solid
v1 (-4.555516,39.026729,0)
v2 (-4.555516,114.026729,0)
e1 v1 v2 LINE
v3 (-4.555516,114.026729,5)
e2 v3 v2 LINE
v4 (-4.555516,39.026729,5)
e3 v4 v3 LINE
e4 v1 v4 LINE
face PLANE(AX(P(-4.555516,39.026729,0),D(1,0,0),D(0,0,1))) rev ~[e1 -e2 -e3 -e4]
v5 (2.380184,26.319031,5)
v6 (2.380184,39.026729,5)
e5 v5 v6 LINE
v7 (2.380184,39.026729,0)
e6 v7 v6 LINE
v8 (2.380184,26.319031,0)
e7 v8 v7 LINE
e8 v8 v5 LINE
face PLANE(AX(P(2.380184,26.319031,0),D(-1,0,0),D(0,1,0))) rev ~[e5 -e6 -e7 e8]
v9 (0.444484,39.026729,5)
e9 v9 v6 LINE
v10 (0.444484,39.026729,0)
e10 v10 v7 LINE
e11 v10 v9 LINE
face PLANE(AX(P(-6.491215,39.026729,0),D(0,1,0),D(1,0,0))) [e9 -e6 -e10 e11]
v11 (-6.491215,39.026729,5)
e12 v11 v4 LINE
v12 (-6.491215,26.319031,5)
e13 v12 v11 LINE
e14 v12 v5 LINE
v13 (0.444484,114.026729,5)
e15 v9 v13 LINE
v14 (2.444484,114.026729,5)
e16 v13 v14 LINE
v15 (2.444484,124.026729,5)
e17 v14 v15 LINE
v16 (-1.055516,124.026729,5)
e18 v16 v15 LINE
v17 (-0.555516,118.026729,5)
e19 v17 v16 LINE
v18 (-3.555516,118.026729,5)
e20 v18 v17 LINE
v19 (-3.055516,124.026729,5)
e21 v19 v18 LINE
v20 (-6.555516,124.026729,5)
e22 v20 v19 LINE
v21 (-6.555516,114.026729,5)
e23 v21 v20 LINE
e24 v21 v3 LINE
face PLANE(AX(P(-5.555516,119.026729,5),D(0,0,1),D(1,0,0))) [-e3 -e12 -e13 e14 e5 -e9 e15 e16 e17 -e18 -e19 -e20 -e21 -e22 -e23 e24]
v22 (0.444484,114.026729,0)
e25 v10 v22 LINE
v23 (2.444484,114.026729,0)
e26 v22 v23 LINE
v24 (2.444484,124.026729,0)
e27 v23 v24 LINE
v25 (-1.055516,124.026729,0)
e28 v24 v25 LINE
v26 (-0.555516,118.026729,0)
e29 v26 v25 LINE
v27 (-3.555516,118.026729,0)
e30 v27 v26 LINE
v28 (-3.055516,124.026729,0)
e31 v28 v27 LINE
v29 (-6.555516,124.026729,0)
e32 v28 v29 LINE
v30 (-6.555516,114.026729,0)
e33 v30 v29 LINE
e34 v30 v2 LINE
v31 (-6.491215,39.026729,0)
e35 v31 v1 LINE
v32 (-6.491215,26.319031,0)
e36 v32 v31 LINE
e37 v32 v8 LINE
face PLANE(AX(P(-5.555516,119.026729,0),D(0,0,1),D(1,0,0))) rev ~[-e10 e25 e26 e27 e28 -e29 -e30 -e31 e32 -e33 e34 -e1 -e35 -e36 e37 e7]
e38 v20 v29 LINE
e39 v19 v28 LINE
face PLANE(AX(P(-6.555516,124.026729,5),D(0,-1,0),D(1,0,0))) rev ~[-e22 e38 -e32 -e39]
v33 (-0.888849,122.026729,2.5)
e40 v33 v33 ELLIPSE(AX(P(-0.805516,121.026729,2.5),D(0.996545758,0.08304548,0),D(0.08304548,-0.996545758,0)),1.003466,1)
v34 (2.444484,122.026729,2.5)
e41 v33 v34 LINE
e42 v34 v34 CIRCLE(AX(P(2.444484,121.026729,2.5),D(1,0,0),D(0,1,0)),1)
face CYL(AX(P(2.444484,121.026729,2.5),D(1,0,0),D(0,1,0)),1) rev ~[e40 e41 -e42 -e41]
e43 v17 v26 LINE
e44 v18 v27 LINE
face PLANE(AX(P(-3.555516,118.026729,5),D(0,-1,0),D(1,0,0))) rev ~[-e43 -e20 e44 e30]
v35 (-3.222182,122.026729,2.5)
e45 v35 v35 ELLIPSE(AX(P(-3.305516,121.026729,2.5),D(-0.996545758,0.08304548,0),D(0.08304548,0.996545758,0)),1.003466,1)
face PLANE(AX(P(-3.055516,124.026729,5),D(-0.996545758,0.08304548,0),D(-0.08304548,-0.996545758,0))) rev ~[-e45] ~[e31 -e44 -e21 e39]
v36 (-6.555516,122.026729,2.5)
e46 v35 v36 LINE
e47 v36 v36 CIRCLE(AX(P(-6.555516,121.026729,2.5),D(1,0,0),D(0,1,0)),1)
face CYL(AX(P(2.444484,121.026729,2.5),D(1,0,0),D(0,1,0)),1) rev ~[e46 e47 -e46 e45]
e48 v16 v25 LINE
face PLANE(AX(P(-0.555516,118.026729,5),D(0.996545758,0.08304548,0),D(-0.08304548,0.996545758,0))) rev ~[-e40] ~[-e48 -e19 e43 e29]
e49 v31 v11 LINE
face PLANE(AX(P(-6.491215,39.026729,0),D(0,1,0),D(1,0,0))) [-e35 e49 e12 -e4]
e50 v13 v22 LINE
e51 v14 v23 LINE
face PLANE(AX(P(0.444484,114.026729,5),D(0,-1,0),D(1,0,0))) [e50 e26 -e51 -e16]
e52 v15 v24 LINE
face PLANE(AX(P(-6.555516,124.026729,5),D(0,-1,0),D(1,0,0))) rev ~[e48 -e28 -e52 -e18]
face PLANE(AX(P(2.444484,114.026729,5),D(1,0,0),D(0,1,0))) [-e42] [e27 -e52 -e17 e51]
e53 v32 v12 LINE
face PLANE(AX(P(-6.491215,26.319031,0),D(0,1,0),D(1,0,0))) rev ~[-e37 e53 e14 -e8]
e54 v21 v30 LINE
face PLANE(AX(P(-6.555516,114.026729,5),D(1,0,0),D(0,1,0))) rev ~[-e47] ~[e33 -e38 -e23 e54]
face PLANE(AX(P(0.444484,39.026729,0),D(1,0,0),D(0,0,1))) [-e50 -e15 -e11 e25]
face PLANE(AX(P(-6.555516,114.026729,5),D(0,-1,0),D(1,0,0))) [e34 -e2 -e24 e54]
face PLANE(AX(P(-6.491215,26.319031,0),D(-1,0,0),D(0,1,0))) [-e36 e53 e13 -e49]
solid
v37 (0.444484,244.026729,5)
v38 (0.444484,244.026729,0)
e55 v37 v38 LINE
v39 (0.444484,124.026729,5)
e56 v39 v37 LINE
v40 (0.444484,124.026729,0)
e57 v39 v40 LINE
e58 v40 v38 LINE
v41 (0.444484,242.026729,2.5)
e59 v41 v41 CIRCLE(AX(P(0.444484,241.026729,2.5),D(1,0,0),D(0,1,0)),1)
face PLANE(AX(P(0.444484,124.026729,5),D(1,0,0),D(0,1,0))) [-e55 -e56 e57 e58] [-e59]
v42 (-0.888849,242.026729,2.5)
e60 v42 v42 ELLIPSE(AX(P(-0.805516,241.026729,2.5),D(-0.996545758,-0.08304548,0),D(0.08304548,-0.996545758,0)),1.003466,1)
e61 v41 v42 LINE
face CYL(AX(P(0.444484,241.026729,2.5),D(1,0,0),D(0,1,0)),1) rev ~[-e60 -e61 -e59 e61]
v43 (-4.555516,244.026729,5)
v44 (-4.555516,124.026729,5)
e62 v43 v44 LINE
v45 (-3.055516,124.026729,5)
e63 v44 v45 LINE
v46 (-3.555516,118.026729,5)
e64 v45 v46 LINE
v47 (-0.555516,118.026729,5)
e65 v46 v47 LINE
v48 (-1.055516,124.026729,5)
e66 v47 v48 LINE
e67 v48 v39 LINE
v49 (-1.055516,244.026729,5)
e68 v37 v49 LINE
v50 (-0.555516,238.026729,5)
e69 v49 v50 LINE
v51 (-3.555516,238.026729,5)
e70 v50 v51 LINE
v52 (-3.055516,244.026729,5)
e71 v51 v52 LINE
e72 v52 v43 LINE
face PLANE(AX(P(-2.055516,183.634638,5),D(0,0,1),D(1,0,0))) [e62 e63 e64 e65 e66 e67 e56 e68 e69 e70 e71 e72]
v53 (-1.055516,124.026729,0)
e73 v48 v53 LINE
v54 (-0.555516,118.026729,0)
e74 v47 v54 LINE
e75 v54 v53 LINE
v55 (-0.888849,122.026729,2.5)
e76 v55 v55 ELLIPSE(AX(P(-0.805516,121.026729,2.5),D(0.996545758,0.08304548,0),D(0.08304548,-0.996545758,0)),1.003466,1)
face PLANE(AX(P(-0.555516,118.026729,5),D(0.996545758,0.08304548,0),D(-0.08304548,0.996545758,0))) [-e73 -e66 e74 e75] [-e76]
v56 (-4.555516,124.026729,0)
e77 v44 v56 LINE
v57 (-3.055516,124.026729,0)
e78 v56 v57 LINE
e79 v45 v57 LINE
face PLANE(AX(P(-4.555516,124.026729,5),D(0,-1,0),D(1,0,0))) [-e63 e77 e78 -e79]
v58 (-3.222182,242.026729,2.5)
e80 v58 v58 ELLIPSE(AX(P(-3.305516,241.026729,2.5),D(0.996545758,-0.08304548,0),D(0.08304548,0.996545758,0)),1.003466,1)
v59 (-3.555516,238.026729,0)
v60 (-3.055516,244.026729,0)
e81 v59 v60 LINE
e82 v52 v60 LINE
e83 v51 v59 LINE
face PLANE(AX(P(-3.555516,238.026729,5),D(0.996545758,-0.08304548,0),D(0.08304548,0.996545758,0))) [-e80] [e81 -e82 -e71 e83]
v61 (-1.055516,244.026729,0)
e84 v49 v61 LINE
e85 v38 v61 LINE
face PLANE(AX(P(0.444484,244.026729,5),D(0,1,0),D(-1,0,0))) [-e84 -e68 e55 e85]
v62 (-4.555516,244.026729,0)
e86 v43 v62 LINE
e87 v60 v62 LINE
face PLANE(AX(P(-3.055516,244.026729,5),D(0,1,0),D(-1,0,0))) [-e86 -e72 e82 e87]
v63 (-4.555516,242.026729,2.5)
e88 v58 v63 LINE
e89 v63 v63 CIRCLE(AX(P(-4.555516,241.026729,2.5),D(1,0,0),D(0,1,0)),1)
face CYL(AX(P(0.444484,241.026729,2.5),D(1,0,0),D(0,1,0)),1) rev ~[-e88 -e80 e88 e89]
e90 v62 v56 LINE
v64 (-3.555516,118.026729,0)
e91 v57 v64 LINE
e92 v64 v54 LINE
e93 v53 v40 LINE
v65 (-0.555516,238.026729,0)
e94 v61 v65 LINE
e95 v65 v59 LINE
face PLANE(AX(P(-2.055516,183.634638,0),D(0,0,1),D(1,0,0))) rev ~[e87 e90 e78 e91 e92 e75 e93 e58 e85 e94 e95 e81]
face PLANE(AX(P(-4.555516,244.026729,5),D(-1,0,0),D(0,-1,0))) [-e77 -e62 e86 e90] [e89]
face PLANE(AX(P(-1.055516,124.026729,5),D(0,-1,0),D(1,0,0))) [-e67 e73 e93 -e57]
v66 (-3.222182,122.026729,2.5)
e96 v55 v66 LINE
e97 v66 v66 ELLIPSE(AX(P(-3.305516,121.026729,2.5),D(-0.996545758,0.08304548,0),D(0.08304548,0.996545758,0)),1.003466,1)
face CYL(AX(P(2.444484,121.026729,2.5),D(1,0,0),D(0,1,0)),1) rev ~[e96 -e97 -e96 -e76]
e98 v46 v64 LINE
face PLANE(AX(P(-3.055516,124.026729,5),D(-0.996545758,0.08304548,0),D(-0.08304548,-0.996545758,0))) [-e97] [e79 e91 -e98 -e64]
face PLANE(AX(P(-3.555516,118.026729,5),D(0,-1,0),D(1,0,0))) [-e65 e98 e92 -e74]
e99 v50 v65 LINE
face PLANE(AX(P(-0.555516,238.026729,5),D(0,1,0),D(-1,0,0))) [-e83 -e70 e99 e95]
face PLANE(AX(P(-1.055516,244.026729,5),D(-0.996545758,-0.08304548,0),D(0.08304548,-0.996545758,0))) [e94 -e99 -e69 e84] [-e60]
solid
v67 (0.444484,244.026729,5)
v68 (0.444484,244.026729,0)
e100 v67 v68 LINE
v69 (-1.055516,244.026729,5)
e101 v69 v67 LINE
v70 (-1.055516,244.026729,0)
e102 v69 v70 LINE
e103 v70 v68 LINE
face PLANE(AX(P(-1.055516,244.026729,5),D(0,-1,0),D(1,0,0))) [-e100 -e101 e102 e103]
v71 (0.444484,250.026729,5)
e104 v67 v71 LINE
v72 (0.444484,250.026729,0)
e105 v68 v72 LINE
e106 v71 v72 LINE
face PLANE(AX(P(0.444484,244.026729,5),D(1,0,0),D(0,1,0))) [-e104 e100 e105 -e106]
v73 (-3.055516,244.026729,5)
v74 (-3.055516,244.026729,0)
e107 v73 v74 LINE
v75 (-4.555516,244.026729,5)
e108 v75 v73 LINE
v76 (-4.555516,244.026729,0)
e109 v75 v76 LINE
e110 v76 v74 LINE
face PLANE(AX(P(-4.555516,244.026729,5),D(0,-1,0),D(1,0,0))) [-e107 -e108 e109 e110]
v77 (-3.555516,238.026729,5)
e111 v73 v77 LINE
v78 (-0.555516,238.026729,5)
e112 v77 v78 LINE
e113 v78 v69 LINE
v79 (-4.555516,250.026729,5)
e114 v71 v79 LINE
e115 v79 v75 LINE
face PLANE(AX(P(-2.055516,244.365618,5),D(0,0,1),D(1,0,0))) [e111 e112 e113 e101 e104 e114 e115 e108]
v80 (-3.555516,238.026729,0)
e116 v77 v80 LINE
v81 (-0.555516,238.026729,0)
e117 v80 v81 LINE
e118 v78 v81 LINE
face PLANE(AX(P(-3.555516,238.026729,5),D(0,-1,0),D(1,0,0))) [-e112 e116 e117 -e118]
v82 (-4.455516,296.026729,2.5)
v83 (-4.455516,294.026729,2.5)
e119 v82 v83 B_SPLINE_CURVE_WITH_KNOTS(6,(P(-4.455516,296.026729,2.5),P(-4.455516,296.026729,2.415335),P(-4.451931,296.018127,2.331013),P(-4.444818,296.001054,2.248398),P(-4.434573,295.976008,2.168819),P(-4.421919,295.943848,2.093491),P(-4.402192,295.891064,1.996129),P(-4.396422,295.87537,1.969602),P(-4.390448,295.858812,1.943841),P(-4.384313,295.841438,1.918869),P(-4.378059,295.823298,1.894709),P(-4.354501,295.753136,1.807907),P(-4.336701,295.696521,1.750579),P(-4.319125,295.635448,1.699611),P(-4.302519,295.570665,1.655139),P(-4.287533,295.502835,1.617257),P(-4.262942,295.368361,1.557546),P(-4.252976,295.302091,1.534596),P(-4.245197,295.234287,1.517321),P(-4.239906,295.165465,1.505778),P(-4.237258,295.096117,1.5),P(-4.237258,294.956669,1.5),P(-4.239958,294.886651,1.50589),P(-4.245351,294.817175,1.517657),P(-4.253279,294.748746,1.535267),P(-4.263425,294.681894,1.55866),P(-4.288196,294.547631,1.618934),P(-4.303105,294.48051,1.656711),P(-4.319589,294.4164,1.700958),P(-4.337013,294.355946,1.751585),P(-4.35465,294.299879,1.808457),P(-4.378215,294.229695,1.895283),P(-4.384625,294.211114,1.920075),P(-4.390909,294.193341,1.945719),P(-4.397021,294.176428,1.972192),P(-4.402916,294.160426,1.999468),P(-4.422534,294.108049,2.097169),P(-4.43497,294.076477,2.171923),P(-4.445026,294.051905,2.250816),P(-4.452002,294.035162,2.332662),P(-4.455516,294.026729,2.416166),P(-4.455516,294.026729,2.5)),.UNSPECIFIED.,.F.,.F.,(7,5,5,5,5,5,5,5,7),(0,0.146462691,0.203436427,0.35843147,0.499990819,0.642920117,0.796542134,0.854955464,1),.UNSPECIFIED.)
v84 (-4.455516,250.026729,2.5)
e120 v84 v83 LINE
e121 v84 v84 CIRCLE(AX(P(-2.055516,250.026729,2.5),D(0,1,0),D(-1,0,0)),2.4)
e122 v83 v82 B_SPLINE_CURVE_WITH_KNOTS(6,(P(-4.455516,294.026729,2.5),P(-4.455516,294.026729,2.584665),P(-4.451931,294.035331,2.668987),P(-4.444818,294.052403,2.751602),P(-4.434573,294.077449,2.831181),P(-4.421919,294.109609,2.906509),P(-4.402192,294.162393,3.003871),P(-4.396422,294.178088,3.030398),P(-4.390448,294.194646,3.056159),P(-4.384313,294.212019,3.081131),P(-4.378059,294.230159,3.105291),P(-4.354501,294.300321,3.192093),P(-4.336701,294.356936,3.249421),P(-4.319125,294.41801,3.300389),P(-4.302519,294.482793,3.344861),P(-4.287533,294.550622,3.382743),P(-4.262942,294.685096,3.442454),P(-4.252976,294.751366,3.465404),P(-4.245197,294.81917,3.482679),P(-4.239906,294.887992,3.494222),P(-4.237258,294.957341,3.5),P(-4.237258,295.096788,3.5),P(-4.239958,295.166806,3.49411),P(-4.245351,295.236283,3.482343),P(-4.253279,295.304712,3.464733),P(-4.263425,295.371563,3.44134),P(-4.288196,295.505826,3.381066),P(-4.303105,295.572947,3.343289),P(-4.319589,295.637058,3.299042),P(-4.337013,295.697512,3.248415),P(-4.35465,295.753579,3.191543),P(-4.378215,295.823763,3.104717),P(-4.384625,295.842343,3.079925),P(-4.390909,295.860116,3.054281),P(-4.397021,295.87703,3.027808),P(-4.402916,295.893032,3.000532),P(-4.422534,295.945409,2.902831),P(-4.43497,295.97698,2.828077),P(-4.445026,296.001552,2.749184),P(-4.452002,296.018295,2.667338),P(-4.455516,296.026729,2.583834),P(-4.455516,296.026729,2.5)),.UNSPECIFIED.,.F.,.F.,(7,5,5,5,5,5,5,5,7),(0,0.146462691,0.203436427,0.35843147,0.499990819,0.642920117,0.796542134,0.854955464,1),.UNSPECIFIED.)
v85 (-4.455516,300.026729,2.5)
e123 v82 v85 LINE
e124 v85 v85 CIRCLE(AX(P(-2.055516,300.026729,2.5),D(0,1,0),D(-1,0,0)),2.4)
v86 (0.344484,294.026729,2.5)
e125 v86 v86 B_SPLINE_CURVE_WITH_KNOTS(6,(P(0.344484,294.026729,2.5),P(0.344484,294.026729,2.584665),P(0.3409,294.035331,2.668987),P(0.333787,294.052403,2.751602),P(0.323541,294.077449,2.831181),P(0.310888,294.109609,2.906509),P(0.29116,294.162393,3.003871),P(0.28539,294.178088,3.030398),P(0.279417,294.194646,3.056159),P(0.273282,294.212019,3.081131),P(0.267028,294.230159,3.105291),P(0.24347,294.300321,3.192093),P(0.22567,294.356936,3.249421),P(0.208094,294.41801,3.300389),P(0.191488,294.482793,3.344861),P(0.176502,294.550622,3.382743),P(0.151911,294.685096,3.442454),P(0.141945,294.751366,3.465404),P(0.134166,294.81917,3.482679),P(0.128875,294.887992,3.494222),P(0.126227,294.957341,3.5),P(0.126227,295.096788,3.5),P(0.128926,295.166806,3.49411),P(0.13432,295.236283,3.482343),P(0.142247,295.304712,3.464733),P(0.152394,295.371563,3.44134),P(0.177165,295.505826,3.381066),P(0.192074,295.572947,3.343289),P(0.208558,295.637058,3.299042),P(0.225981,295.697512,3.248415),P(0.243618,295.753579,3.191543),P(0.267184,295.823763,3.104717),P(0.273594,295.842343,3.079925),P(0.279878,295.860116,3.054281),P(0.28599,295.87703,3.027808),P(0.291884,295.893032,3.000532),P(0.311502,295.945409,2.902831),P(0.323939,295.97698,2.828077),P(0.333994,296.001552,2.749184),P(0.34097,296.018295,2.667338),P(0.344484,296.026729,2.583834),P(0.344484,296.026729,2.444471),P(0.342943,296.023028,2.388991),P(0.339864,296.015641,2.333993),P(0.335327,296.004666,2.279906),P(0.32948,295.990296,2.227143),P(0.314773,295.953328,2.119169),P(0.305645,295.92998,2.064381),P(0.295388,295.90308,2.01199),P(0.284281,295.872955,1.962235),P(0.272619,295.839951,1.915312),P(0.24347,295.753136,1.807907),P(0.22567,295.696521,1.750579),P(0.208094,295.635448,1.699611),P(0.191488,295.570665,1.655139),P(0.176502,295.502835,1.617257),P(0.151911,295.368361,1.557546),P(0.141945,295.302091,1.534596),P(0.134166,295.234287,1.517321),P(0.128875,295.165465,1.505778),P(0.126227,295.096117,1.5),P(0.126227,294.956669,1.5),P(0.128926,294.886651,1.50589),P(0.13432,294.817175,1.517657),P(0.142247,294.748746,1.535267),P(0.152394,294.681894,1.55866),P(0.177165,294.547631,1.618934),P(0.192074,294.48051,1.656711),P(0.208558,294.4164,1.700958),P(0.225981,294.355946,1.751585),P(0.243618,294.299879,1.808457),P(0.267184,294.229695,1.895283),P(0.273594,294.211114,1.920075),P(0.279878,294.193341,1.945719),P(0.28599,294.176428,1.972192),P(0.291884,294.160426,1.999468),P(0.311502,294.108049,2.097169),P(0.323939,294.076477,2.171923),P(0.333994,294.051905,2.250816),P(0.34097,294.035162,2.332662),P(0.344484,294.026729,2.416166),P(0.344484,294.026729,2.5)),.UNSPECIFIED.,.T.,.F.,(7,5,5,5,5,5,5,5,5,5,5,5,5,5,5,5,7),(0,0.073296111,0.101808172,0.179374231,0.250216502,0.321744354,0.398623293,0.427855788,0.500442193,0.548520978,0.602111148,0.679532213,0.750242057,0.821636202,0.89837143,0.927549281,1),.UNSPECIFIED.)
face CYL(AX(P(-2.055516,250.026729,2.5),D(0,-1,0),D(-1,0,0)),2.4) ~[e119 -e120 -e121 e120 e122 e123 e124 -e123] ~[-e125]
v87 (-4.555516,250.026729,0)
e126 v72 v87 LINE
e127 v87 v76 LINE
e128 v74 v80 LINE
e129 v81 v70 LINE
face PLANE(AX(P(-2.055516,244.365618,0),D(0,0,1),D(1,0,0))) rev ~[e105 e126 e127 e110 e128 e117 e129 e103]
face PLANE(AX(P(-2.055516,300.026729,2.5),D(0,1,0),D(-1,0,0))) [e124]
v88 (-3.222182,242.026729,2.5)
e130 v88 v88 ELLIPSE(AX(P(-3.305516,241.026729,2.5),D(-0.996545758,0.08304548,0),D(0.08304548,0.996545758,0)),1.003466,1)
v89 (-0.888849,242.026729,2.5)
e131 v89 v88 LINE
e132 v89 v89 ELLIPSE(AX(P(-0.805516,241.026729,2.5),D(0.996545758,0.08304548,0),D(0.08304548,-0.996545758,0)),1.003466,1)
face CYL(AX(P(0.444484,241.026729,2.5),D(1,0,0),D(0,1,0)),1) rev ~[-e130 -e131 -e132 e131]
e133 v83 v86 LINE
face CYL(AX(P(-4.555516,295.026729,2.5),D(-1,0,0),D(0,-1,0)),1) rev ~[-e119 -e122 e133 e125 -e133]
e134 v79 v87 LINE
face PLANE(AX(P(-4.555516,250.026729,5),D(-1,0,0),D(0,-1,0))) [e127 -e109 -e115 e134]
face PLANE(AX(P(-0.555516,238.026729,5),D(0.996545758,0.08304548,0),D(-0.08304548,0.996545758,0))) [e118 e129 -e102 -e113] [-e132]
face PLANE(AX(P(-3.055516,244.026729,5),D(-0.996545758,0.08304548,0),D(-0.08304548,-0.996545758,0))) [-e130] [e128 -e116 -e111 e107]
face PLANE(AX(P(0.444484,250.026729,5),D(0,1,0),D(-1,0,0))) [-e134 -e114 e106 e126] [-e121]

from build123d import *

# Parameters (mm, degrees)
F0_W           = 8.8713987993
F0_H           = 12.7076974937
F1_DEPTH       = 5
F2_W           = 5
F2_H           = 5
F3_DEPTH       = 85
F4_W           = 2
F4_H           = 10
F5_DEPTH       = 5
F6_DEPTH       = 5
F8_DEPTH       = 5
F9_R           = 1
F10_DEPTH      = 10
F11_R          = 1
F12_DEPTH      = 8
F12_DEPTH_BACK = 3
F13_DEPTH      = 5
F14_DEPTH      = 5
F15_R          = 2.4
F16_DEPTH      = 50
F17_R          = 1
F18_DEPTH      = 5
F19_DEPTH      = 5
F20_R          = 1
F21_DEPTH      = 5


# Not quite as in the source:
# - a feature names something its author has since deleted; it is built from what else it names


with BuildPart() as f1:
    # F0 (on Top) → F1 (new body)
    with BuildSketch(Plane.XY):
        with Locations((-2.0555156266, 32.6728799325)):
            Rectangle(F0_W, F0_H)
    extrude(amount=F1_DEPTH)

    # F2 (on face) → F3 (join)
    with BuildSketch(Plane(origin=(0, 39.0267286794, 0), x_dir=(-1, 0, 0), z_dir=(0, 1, 0))):
        with Locations((2.0555156266, 2.5)):
            Rectangle(F2_W, F2_H)
    extrude(amount=F3_DEPTH)

    # F4 (on face) → F5 (join)
    with BuildSketch(Plane.XY.offset(5)):
        with Locations((-5.5555156266, 119.0267286794)):
            Rectangle(F4_W, F4_H)
        with Locations((1.4444843734, 119.0267286794)):
            Rectangle(F4_W, F4_H)
    extrude(amount=-F5_DEPTH)

    # F4 (on face) → F6 (cut)
    with BuildSketch(Plane.XY.offset(5)):
        Polygon((-1.0555156266, 124.0267286794), (-3.0555156266, 124.0267286794), (-3.5555156266, 118.0267286794), (-0.5555156266, 118.0267286794), align=None)
    extrude(amount=-F6_DEPTH, mode=Mode.SUBTRACT)


with BuildPart() as f8:
    # F7 (on face) → F8 (new body)
    with BuildSketch(Plane.XY.offset(5)):
        Polygon((-1.0555156266, 124.0267286794), (0.4444843734, 124.0267286794), (0.4444843734, 244.0267286794), (-1.0555156266, 244.0267286794), (-0.5555156266, 238.0267286794), (-3.5555156266, 238.0267286794), (-3.0555156266, 244.0267286794), (-4.5555156266, 244.0267286794), (-4.5555156266, 124.0267286794), (-3.0555156266, 124.0267286794), (-3.5555156266, 118.0267286794), (-0.5555156266, 118.0267286794), align=None)
    extrude(amount=-F8_DEPTH)


with BuildPart() as f10_tool:
    # F9 (on face) → F10 (new body)
    with BuildSketch(Plane.YZ.offset(2.4444843734)):
        with Locations((121.0267286794, 2.5)):
            Circle(F9_R)
    extrude(amount=-F10_DEPTH)


with BuildPart() as f1_1:
    add(f1.part)

    # F10: cut by f10_tool
    add(f10_tool.part, mode=Mode.SUBTRACT)

    # F11 (on face) → F12 (cut, two sides)
    with BuildSketch(Plane.YZ.offset(0.4444843734)) as f12_sk:
        with Locations((121.0267286794, 2.5)):
            Circle(F11_R)
    extrude(amount=-F12_DEPTH, mode=Mode.SUBTRACT)
    extrude(f12_sk.sketch, amount=F12_DEPTH_BACK, mode=Mode.SUBTRACT)

    # F7 (on face) → F13 (cut)
    with BuildSketch(Plane.XY.offset(5)):
        Polygon((-1.0555156266, 244.0267286794), (0.4444843734, 244.0267286794), (0.4444843734, 250.0267286794), (-4.5555156266, 250.0267286794), (-4.5555156266, 244.0267286794), (-3.0555156266, 244.0267286794), (-3.5555156266, 238.0267286794), (-0.5555156266, 238.0267286794), align=None)
    extrude(amount=-F13_DEPTH, mode=Mode.SUBTRACT)

    # F17 (on face) → F19 (cut)
    with BuildSketch(Plane.YZ.offset(0.4444843734)):
        with Locations((241.0267286794, 2.5)):
            Circle(F17_R)
    extrude(amount=-F19_DEPTH, mode=Mode.SUBTRACT)


with BuildPart() as f8_1:
    add(f8.part)

    # F10: cut by f10_tool
    add(f10_tool.part, mode=Mode.SUBTRACT)


with BuildPart() as f14:
    # F7 (on face) → F14 (new body)
    with BuildSketch(Plane.XY.offset(5)):
        Polygon((-1.0555156266, 244.0267286794), (0.4444843734, 244.0267286794), (0.4444843734, 250.0267286794), (-4.5555156266, 250.0267286794), (-4.5555156266, 244.0267286794), (-3.0555156266, 244.0267286794), (-3.5555156266, 238.0267286794), (-0.5555156266, 238.0267286794), align=None)
    extrude(amount=-F14_DEPTH)

    # F15 (on face) → F16 (join)
    with BuildSketch(Plane(origin=(0, 250.0267286794, 0), x_dir=(-1, 0, 0), z_dir=(0, 1, 0))):
        with Locations((2.0555156266, 2.5)):
            Circle(F15_R)
    extrude(amount=F16_DEPTH)


with BuildPart() as f18_tool:
    # F17 (on face) → F18 (new body)
    with BuildSketch(Plane.YZ.offset(0.4444843734)):
        with Locations((241.0267286794, 2.5)):
            Circle(F17_R)
    extrude(amount=-F18_DEPTH)


with BuildPart() as f8_2:
    add(f8_1.part)

    # F18: cut by f18_tool
    add(f18_tool.part, mode=Mode.SUBTRACT)


with BuildPart() as f14_1:
    add(f14.part)

    # F18: cut by f18_tool
    add(f18_tool.part, mode=Mode.SUBTRACT)

    # F20 (on face) → F21 (cut)
    with BuildSketch(Plane(origin=(-4.5555156266, 0, 0), x_dir=(0, -1, 0), z_dir=(-1, 0, 0))):
        with Locations((-295.0267286794, 2.5)):
            Circle(F20_R)
    extrude(amount=-F21_DEPTH, mode=Mode.SUBTRACT)


solid = Compound([f1_1.part, f8_2.part, f14_1.part])
